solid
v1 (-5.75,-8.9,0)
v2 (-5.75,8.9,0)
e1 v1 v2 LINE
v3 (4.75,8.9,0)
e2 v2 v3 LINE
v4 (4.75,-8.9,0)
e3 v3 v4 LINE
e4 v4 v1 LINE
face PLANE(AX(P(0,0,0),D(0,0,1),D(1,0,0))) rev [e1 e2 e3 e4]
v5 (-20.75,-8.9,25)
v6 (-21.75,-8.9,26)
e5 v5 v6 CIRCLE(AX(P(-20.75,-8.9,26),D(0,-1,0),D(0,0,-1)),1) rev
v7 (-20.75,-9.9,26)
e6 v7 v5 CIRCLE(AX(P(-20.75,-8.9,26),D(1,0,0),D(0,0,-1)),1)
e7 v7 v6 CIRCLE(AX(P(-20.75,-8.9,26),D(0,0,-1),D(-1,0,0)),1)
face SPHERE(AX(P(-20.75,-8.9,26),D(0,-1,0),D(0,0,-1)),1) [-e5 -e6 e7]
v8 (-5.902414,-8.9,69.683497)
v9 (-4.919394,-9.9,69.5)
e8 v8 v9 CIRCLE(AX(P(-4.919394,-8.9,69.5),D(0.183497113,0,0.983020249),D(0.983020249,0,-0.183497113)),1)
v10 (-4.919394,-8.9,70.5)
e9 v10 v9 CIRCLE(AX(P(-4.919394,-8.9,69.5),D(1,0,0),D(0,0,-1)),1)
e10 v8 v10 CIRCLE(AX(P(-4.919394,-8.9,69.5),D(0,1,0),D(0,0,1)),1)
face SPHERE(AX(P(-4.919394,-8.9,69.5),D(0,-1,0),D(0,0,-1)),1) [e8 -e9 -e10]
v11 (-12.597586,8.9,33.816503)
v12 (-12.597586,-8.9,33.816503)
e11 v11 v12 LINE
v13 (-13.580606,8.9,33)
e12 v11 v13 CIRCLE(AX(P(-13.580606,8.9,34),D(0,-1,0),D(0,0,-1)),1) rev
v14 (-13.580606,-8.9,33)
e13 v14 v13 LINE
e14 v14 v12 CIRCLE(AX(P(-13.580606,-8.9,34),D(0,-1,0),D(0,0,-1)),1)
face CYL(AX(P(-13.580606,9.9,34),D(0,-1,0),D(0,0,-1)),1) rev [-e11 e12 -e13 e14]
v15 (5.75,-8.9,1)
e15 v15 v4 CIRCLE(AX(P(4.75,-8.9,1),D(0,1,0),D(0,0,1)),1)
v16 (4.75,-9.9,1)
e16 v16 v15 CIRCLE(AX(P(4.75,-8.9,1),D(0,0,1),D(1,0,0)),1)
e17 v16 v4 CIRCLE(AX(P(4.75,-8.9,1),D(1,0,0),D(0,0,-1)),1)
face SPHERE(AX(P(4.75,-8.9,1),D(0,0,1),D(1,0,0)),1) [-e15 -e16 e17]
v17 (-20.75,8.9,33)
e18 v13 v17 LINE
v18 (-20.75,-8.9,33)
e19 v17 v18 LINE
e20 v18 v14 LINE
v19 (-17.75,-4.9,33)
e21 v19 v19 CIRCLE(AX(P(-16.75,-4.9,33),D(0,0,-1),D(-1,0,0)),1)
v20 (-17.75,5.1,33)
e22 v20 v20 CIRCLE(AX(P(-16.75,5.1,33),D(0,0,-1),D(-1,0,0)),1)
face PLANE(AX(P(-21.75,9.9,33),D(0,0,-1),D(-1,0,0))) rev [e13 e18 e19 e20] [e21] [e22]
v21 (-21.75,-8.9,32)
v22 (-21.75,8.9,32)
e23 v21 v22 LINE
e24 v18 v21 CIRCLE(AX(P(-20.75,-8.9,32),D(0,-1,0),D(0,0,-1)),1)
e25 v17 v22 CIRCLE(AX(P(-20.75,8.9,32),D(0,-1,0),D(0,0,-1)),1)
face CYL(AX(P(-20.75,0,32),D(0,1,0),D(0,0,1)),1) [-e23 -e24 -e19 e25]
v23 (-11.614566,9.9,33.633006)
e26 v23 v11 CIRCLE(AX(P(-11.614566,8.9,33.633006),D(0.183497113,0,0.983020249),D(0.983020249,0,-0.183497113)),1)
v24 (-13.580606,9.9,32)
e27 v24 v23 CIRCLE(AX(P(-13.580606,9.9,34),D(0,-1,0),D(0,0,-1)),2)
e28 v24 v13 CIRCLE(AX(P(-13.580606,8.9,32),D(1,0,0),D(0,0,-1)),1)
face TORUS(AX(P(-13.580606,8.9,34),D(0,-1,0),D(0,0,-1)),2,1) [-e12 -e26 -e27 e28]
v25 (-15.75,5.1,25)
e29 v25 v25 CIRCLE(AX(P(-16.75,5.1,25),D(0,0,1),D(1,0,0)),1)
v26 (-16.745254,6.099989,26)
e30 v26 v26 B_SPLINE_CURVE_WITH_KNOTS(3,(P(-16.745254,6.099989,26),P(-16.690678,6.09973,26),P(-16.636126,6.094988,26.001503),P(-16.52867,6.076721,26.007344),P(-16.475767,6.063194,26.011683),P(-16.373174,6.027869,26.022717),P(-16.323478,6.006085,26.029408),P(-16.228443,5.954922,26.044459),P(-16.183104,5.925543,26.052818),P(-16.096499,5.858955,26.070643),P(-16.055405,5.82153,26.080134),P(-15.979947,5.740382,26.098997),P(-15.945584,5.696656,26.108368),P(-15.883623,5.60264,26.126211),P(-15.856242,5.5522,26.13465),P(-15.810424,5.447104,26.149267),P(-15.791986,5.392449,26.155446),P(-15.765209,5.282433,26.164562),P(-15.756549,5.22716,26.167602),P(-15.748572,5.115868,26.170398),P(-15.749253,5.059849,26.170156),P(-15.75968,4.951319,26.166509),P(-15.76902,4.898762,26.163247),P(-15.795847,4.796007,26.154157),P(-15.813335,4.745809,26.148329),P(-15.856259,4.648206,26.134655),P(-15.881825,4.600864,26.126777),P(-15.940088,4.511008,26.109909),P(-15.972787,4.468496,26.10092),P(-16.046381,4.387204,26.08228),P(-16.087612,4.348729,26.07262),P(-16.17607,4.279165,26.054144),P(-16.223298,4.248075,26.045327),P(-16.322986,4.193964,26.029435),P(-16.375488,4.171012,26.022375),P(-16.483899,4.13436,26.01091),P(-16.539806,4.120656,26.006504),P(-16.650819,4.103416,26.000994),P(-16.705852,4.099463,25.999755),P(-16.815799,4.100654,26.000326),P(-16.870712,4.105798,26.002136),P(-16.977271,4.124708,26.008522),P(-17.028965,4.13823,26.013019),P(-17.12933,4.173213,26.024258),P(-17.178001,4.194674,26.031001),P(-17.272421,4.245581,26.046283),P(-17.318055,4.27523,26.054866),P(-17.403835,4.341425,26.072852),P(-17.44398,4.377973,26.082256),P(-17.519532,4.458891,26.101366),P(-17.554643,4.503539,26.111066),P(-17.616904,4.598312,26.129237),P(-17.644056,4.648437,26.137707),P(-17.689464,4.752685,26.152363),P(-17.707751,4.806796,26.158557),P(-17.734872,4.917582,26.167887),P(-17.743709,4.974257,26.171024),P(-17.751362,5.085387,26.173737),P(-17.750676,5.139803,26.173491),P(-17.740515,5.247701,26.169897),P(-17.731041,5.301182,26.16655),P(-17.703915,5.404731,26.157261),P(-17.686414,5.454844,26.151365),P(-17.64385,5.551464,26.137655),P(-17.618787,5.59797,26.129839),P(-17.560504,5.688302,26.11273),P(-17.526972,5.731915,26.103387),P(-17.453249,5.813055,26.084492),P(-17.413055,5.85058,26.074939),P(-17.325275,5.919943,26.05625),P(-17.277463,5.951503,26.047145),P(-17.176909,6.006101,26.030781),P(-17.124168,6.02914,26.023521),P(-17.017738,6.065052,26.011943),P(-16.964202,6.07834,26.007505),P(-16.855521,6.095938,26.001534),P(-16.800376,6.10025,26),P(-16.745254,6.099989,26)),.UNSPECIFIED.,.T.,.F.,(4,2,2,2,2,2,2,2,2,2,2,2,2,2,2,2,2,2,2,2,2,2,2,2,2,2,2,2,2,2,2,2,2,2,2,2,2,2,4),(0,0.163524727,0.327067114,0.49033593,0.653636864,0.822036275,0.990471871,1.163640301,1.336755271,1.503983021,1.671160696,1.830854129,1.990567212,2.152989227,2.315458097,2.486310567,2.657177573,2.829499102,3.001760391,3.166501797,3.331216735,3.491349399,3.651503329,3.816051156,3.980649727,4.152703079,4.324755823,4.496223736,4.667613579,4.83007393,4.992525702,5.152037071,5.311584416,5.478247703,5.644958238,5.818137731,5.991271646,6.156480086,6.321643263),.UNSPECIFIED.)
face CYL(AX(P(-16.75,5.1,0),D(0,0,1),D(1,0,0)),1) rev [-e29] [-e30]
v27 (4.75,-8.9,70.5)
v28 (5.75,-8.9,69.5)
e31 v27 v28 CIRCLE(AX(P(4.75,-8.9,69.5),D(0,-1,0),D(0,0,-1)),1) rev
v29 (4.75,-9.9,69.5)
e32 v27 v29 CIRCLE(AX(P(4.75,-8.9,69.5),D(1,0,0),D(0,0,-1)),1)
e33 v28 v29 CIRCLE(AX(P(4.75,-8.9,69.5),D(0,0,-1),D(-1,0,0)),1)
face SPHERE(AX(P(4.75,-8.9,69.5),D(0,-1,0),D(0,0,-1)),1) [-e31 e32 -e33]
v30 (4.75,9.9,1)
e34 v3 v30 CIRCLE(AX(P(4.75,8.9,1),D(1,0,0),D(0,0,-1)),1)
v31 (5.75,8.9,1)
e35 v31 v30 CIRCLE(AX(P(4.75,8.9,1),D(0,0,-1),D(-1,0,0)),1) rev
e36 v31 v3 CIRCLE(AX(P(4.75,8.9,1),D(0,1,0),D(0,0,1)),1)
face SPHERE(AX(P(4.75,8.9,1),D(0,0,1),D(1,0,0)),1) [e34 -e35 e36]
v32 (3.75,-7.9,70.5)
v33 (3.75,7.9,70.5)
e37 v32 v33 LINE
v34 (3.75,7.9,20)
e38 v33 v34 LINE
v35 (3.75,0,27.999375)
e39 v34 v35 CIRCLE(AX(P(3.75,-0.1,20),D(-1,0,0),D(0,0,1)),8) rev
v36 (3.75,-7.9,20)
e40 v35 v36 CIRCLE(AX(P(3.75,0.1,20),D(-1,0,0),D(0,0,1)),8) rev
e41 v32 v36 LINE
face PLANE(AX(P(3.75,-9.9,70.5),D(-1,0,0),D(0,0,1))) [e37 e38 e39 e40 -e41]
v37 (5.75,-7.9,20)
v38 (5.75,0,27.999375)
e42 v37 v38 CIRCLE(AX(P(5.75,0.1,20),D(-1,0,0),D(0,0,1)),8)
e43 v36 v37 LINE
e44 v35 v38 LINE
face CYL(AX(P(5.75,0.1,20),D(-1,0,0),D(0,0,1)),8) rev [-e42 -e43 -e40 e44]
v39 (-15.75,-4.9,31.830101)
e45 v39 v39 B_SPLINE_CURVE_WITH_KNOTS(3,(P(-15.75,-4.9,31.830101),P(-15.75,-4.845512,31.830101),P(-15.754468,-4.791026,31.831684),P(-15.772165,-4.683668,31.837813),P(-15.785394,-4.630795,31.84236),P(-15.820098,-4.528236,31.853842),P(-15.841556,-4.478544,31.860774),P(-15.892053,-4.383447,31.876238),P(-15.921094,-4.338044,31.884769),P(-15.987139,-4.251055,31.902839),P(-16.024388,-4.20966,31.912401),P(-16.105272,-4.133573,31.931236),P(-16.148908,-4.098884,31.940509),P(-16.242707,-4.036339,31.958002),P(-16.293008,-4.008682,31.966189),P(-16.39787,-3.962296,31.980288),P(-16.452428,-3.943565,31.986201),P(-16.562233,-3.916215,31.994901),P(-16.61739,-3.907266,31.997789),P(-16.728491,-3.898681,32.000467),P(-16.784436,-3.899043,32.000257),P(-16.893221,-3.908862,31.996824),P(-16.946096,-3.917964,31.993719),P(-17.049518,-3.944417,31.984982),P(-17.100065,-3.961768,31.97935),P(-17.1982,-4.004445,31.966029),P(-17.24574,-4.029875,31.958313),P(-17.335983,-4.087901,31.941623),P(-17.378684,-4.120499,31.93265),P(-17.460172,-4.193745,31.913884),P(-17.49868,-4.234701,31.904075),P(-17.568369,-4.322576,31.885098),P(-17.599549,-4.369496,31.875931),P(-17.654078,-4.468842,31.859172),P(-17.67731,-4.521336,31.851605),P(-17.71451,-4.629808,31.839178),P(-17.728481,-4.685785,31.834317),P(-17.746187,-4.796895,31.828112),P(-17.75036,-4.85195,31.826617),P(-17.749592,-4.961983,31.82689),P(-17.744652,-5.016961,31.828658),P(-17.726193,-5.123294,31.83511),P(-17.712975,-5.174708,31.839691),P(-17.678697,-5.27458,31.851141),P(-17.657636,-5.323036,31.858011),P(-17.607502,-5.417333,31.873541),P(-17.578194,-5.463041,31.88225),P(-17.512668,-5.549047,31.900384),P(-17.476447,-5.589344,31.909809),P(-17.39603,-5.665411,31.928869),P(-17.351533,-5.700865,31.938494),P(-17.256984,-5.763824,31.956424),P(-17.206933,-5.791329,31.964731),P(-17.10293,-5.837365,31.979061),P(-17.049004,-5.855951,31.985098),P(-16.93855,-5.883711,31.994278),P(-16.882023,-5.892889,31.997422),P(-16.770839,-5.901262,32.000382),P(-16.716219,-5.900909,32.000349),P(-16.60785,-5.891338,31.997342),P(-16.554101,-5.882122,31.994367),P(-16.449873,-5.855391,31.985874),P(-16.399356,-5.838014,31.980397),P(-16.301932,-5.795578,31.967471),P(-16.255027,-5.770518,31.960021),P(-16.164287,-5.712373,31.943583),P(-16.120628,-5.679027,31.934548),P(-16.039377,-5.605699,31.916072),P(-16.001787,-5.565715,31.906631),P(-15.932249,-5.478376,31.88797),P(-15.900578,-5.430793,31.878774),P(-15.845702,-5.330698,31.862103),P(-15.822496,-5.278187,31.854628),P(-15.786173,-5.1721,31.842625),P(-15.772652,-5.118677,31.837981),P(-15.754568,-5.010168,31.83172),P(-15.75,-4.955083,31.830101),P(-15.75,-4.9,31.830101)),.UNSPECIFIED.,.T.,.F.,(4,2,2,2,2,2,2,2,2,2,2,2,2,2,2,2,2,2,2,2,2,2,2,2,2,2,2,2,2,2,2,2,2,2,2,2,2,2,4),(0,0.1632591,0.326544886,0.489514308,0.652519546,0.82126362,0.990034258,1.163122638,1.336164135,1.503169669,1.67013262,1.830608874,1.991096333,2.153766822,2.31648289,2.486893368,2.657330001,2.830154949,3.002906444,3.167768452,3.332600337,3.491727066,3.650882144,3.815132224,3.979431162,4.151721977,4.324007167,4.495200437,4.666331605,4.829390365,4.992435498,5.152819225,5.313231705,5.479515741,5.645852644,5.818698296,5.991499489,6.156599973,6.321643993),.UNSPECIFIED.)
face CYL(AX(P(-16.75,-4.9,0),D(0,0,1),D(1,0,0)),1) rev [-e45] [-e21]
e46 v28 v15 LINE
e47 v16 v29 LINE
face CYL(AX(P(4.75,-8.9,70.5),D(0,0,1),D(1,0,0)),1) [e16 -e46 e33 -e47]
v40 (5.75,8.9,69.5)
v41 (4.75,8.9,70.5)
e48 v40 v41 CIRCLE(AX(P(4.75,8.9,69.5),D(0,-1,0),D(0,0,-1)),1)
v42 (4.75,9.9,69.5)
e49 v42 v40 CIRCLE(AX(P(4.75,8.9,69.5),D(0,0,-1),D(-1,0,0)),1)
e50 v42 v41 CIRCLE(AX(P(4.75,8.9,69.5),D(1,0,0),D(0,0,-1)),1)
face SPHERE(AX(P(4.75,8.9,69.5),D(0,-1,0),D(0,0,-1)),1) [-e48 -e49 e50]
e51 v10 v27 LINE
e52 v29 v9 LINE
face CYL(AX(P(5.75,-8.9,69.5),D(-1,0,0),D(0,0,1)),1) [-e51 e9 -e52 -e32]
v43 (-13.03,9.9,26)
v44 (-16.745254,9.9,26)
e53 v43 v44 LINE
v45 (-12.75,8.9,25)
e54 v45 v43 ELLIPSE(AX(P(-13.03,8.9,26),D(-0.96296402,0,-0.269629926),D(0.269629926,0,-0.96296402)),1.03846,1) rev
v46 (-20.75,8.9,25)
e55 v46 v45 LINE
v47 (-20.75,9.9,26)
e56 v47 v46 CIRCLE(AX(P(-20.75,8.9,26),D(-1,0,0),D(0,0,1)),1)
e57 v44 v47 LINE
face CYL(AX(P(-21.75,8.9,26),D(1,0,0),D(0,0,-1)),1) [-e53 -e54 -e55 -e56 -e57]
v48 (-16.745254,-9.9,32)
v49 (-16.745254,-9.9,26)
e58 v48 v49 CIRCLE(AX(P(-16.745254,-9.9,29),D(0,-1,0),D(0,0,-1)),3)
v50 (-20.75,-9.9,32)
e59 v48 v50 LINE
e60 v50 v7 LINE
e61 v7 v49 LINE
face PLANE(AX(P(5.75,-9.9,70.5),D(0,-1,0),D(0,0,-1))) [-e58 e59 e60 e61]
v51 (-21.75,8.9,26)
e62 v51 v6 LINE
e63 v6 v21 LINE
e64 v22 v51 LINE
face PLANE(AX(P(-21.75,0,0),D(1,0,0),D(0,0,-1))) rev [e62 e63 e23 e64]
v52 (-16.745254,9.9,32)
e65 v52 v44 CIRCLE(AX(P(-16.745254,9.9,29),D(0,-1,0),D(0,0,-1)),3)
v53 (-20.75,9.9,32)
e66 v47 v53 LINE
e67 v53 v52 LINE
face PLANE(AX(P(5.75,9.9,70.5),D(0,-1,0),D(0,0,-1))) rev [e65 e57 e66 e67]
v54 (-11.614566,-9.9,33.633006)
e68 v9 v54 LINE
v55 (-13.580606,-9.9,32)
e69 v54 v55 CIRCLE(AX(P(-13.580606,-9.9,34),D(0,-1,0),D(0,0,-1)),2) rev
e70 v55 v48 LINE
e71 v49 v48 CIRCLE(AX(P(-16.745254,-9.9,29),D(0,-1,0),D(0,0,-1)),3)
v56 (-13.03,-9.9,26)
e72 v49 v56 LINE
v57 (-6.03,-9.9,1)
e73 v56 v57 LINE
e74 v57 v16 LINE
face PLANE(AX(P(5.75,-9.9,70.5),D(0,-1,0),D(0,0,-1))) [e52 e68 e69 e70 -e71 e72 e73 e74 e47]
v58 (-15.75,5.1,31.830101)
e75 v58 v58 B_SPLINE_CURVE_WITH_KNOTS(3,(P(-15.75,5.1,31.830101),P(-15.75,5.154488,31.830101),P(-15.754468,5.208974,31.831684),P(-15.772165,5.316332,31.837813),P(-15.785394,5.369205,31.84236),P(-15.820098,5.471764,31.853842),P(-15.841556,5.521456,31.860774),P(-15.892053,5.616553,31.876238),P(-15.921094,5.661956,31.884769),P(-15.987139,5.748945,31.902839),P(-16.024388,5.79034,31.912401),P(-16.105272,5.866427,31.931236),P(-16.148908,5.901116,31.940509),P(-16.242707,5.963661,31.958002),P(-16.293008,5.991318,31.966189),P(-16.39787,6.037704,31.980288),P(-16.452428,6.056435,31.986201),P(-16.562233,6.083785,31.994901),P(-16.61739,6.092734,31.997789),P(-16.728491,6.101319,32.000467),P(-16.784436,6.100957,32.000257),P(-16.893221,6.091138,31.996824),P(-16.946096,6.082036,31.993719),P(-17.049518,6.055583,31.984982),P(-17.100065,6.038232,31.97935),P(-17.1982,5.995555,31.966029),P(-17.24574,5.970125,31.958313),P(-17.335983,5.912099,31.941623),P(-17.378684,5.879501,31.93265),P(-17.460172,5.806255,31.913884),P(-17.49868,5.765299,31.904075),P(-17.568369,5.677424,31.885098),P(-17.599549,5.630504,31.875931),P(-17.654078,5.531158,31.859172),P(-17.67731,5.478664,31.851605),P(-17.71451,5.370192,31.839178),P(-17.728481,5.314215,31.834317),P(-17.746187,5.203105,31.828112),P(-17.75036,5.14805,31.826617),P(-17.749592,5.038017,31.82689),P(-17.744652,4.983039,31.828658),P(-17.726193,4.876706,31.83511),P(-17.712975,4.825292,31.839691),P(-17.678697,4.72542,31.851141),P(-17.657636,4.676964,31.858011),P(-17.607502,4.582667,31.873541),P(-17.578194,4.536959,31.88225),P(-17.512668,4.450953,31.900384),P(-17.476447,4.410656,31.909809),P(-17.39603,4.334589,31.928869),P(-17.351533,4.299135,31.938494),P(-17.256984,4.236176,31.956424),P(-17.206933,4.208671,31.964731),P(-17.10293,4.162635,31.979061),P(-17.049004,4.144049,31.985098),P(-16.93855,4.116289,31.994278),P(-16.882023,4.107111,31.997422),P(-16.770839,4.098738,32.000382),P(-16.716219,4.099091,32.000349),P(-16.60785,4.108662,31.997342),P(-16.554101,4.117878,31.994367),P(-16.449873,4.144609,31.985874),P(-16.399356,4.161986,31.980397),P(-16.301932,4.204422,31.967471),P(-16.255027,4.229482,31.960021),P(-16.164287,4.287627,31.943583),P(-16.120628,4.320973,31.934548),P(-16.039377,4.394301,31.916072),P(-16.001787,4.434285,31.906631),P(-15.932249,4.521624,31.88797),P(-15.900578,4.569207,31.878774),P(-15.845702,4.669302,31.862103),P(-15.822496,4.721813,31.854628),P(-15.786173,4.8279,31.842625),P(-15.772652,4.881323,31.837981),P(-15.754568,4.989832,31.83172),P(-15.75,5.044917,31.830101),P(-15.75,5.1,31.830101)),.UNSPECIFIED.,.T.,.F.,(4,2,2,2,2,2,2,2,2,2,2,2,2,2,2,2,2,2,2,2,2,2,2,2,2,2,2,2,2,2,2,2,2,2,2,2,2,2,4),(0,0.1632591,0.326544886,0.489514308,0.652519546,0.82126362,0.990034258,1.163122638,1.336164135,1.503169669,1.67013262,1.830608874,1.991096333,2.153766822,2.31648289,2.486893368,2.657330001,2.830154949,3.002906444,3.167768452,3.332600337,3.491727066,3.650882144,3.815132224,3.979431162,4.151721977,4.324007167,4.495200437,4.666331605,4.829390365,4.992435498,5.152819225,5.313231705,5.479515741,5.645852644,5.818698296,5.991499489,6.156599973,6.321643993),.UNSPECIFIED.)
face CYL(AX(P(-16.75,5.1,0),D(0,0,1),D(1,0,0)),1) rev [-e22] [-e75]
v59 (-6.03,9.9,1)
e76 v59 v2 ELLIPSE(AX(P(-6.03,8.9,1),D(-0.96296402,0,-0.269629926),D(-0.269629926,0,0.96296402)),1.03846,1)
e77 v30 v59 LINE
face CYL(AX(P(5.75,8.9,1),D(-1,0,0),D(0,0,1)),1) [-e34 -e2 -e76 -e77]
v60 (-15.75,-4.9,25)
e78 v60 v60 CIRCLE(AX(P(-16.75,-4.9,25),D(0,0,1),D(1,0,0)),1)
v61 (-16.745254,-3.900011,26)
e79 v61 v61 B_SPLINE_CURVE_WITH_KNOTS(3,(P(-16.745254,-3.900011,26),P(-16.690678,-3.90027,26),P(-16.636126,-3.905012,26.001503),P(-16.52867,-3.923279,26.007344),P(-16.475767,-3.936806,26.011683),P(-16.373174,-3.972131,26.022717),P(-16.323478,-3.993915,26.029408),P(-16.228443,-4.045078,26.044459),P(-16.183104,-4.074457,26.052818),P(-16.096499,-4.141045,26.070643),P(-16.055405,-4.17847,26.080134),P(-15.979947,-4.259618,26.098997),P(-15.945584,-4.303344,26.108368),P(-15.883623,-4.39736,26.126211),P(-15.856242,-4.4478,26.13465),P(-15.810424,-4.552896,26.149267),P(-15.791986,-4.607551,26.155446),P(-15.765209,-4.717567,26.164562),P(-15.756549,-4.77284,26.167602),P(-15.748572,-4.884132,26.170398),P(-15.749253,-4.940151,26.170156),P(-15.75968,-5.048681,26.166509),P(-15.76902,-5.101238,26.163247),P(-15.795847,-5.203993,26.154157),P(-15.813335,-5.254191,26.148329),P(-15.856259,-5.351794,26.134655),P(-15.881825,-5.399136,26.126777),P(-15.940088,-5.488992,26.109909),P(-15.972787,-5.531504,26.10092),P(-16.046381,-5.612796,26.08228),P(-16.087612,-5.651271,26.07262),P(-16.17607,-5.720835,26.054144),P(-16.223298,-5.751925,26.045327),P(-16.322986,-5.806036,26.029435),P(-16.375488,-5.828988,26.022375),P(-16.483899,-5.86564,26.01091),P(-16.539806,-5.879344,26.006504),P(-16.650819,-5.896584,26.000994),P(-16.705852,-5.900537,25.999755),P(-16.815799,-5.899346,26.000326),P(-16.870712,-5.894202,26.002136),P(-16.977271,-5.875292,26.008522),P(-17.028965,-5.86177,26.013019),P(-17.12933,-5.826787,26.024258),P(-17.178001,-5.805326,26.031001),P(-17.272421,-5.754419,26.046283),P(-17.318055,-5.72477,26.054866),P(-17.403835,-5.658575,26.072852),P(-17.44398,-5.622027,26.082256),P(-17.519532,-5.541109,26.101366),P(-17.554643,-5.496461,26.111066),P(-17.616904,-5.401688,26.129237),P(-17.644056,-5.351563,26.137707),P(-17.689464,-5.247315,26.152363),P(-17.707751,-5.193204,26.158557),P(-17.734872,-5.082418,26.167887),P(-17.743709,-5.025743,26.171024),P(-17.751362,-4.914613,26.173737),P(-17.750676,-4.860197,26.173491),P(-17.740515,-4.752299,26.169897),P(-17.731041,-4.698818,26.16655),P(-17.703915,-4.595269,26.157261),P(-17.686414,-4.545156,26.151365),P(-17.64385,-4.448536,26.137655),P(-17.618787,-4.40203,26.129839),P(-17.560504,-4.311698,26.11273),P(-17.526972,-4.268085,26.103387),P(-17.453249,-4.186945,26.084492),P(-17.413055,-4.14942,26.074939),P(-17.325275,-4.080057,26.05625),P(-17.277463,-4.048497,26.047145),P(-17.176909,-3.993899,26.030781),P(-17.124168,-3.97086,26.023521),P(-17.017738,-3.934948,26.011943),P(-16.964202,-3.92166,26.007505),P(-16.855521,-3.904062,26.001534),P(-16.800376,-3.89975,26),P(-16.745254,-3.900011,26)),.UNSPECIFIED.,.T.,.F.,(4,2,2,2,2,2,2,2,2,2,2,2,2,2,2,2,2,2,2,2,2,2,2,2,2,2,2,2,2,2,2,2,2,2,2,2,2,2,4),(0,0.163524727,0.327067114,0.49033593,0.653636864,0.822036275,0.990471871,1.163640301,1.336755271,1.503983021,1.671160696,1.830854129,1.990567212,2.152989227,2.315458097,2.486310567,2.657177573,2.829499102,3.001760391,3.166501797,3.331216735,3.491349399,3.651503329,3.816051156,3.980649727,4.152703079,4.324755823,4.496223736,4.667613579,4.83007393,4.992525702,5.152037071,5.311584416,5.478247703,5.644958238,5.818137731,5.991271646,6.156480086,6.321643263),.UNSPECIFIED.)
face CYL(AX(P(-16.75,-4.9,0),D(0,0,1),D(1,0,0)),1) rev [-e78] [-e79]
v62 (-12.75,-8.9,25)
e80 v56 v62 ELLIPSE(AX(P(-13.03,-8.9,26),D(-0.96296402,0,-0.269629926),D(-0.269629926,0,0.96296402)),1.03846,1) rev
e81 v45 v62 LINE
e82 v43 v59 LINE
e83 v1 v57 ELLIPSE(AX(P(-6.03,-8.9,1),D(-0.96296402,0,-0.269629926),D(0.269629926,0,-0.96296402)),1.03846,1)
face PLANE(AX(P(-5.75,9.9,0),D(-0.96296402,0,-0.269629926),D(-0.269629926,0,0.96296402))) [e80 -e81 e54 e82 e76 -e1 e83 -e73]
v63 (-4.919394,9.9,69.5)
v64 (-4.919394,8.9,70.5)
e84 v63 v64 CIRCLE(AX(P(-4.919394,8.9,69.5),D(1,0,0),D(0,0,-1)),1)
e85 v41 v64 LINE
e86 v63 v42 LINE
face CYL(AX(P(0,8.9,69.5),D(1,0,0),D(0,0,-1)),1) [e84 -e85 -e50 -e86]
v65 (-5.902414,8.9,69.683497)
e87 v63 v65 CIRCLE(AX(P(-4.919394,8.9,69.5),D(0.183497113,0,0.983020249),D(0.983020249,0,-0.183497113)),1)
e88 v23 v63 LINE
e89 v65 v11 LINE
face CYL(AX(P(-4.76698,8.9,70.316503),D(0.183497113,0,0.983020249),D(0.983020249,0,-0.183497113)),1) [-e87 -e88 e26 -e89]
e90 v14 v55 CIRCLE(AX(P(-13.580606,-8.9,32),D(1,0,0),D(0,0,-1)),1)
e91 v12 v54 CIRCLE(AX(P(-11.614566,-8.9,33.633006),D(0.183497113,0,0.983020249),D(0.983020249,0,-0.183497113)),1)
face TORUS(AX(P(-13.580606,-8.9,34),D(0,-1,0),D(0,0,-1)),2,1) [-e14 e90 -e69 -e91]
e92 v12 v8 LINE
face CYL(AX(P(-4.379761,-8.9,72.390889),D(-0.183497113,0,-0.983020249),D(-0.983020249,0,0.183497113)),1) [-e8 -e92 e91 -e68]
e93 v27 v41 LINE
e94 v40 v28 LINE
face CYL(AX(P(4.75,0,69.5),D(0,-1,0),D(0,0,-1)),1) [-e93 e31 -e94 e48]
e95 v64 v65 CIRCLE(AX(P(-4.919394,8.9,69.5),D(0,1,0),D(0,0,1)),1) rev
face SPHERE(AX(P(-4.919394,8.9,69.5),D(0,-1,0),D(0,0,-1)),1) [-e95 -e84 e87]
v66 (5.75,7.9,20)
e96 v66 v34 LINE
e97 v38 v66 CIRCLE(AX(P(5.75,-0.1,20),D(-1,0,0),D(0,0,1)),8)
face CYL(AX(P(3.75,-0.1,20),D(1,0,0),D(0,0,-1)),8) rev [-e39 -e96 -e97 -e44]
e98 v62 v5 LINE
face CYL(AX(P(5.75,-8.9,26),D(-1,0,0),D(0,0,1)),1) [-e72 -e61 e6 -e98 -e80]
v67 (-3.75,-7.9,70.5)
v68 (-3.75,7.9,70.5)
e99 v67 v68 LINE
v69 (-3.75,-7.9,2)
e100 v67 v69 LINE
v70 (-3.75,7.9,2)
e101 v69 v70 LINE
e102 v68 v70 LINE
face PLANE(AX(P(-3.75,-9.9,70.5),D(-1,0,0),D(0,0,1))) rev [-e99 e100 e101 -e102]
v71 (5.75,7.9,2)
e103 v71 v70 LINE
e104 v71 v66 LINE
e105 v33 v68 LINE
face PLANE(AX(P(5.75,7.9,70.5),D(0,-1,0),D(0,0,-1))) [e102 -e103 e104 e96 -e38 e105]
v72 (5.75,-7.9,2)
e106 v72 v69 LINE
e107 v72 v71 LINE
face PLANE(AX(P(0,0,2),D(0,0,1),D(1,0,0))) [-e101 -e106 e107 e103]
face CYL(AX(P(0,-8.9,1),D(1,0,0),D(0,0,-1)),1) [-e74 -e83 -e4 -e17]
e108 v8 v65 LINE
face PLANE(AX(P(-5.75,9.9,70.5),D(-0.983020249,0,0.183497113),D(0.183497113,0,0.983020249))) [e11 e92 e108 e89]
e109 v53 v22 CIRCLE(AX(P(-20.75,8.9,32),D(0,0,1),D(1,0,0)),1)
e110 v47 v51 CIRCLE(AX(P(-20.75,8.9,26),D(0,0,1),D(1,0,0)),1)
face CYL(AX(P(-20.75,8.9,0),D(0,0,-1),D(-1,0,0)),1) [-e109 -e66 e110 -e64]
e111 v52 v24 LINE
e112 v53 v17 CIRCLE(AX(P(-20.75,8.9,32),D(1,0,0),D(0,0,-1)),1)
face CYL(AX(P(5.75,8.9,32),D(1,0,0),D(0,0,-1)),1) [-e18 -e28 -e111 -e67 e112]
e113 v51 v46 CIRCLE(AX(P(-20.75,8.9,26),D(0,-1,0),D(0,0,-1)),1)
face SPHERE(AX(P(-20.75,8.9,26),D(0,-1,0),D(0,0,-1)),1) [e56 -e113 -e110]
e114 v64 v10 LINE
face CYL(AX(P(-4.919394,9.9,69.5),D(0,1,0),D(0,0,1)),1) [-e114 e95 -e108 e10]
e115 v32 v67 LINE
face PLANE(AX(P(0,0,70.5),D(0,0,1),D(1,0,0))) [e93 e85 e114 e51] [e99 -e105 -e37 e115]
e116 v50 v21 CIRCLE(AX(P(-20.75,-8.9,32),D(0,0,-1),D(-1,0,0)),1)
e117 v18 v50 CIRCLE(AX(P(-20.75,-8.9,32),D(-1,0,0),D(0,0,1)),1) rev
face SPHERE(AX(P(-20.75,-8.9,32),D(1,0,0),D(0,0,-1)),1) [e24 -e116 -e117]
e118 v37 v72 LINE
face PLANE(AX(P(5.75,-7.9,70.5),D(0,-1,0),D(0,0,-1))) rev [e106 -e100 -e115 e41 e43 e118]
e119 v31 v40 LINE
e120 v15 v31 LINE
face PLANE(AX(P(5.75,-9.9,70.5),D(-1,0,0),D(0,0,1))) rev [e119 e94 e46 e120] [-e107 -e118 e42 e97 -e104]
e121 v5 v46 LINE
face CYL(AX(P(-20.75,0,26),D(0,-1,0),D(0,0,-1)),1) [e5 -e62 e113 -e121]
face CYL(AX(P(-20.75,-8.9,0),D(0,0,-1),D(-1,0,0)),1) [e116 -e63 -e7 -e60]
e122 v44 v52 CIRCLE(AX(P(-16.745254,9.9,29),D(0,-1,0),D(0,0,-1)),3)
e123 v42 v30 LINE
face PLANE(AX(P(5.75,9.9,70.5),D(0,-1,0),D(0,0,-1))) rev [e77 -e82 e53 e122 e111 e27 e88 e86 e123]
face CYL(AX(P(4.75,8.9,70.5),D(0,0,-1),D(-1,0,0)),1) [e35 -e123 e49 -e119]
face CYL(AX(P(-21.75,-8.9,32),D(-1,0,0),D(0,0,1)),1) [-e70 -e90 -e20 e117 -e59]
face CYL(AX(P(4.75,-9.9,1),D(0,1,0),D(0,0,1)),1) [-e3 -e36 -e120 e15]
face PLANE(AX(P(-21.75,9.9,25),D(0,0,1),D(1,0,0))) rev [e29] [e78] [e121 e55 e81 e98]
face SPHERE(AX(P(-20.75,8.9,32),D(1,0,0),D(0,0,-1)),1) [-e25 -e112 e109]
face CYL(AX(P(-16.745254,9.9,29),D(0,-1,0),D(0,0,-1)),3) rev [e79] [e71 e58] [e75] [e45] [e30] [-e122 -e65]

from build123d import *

# Parameters (mm, degrees)
CROQUIS1_W                 = 19.8
CROQUIS1_H                 = 11.5
SALIENTE_EXTRUIR1_DEPTH    = 70.5
VACIADO1_T                 = -2
CROQUIS5_W                 = 15.8
CROQUIS5_H                 = 2
SALIENTE_EXTRUIR2_DEPTH    = 2
CROQUIS6_W                 = 19.8
CROQUIS6_H                 = 8
SALIENTE_EXTRUIR4_DEPTH    = 16
SALIENTE_EXTRUIR5_DEPTH    = 19.8
CROQUIS10_R                = 3
CORTAR_EXTRUIR4_DEPTH      = 19.8
CORTAR_EXTRUIR3_DEPTH      = 43.653516854
CORTAR_EXTRUIR3_DEPTH_BACK = 43.653516854
CROQUIS8_R                 = 1
CROQUIS11_W                = 15.8
CROQUIS11_H                = 26
CORTAR_EXTRUIR5_DEPTH      = 2
REDONDEO2_R                = 8
REDONDEO4_R                = 1
REDONDEO5_R                = 1
REDONDEO6_R                = 1
REDONDEO7_R                = 1
REDONDEO8_R                = 1


# Some blends are built 0.0001 mm under size
with BuildPart() as part:
    # Croquis1 → Saliente-Extruir1 (new body)
    with BuildSketch(Plane(origin=(0, 0, 0), x_dir=(0, 1, 0), z_dir=(0, 0, 1))):
        Rectangle(CROQUIS1_W, CROQUIS1_H)
    extrude(amount=SALIENTE_EXTRUIR1_DEPTH)

    # Vaciado1
    vaciado1_openings = [part.faces().sort_by_distance(p)[0] for p in [
        (0, 0, 70.5),
    ]]
    offset(amount=VACIADO1_T, openings=vaciado1_openings, kind=Kind.INTERSECTION)

    # Croquis5 → Saliente-Extruir2 (add)
    with BuildSketch(Plane.YZ.offset(5.75)):
        with Locations((0, 69.5)):
            Rectangle(CROQUIS5_W, CROQUIS5_H)
    extrude(amount=-SALIENTE_EXTRUIR2_DEPTH)

    # Croquis6 → Saliente-Extruir4 (add)
    with BuildSketch(Plane(origin=(-5.75, 0, 0), x_dir=(0, -1, 0), z_dir=(-1, 0, 0))):
        with Locations((0, 29)):
            Rectangle(CROQUIS6_W, CROQUIS6_H)
    extrude(amount=SALIENTE_EXTRUIR4_DEPTH)

    # Croquis9 → Saliente-Extruir5 (add)
    with BuildSketch(Plane.XZ.offset(9.9)):
        Polygon((-5.75, 70.5), (-12.75, 33), (-5.75, 33), align=None)
        Polygon((-5.75, 0), (-12.75, 25), (-5.75, 25), align=None)
    extrude(amount=-SALIENTE_EXTRUIR5_DEPTH)

    # Croquis10 → Cortar-Extruir4 (cut)
    with BuildSketch(Plane.XZ.offset(9.9)):
        with Locations(Location((-16.745253682, 29, 0), (0, 0, 270))):
            Circle(CROQUIS10_R)
    extrude(amount=-CORTAR_EXTRUIR4_DEPTH, mode=Mode.SUBTRACT)

    # Croquis8 → Cortar-Extruir3 (cut, two sides: drawn at the far end of the back side and taken through both)
    with BuildSketch(Plane(origin=(-4, 0, 33), x_dir=(1, 0, 0), z_dir=(0, 0, 1)).offset(-CORTAR_EXTRUIR3_DEPTH_BACK)):
        with Locations((-12.75, 5.1)):
            Circle(CROQUIS8_R)
        with Locations((-12.75, -4.9)):
            Circle(CROQUIS8_R)
    extrude(amount=CORTAR_EXTRUIR3_DEPTH + CORTAR_EXTRUIR3_DEPTH_BACK, mode=Mode.SUBTRACT)

    # Croquis11 → Cortar-Extruir5 (cut)
    with BuildSketch(Plane.YZ.offset(5.75)):
        with Locations((0, 15)):
            Rectangle(CROQUIS11_W, CROQUIS11_H)
    extrude(amount=-CORTAR_EXTRUIR5_DEPTH, mode=Mode.SUBTRACT)

    # Redondeo2
    # the kernel refuses this fillet: 8 mm, written as the material it adds along each edge
    with BuildSketch(Plane(origin=(5.75, -7.9, 28), x_dir=(0, 1, 0), z_dir=(-1, 0, 0)), Plane(origin=(5.75, 7.9, 28), x_dir=(0, 0, -1), z_dir=(-1, 0, 0))) as redondeo2_piece_1:
        with BuildLine():
            CenterArc((REDONDEO2_R, REDONDEO2_R), REDONDEO2_R, 180, 90)
            Line((0, REDONDEO2_R), (0, 0))
            Line((0, 0), (REDONDEO2_R, 0))
        make_face()
    extrude(amount=2)

    # Redondeo4
    redondeo4_edges = [part.edges().sort_by_distance(p)[0] for p in [
        (-12.75, 0, 33),
    ]]
    fillet(redondeo4_edges, radius=REDONDEO4_R)

    # Redondeo5
    redondeo5_edges = [part.edges().sort_by_distance(p)[0] for p in [
        (5.75, 0, 70.5),
        (-5.75, 0, 70.5),
    ]]
    fillet(redondeo5_edges, radius=REDONDEO5_R)

    # Redondeo6
    redondeo6_edges = [part.edges().sort_by_distance(p)[0] for p in [
        (-12.941660805, -9.9, 33.230748054),
        (-12.941660805, 9.9, 33.230748054),
        (-9.25, 9.9, 51.75),
        (-9.25, -9.9, 51.75),
        (-0.084696812, 9.9, 70.5),
        (5.75, 9.9, 34.75),
        (5.457106781, 9.9, 70.207106781),
        (-5.558339195, 9.9, 70.269251946),
        (-0.084696812, -9.9, 70.5),
        (5.75, -9.9, 34.75),
        (5.457106781, -9.9, 70.207106781),
        (-5.558339195, -9.9, 70.269251946),
        (-17.665303188, 9.9, 33),
        (-17.665303188, -9.9, 33),
    ]]
    fillet(redondeo6_edges, radius=REDONDEO6_R - 0.0001)  # a hair under: the kernel refuses the full size

    # Redondeo7
    redondeo7_edges = [part.edges().sort_by_distance(p)[0] for p in [
        (-0.49995, 9.9, 0),
        (5.75, 0, 0),
        (-0.49995, -9.9, 0),
        (5.457136071, -9.607136071, 0),
        (5.457136071, 9.607136071, 0),
        (-21.75, 0, 25),
    ]]
    fillet(redondeo7_edges, radius=REDONDEO7_R - 0.0001)  # a hair under: the kernel refuses the full size

    # Redondeo8
    redondeo8_edges = [part.edges().sort_by_distance(p)[0] for p in [
        (-21.75, 9.9, 29),
        (-21.75, 0, 33),
        (-21.75, -9.607136071, 32.707136071),
        (-21.75, 9.607136071, 32.707136071),
        (-21.75, -9.9, 29),
        (-16.75005, -9.9, 25),
        (-21.457136071, -9.9, 25.292863929),
        (-16.75005, 9.9, 25),
        (-21.457136071, 9.9, 25.292863929),
    ]]
    fillet(redondeo8_edges, radius=REDONDEO8_R - 0.0001)  # a hair under: the kernel refuses the full size


solid = part.part
